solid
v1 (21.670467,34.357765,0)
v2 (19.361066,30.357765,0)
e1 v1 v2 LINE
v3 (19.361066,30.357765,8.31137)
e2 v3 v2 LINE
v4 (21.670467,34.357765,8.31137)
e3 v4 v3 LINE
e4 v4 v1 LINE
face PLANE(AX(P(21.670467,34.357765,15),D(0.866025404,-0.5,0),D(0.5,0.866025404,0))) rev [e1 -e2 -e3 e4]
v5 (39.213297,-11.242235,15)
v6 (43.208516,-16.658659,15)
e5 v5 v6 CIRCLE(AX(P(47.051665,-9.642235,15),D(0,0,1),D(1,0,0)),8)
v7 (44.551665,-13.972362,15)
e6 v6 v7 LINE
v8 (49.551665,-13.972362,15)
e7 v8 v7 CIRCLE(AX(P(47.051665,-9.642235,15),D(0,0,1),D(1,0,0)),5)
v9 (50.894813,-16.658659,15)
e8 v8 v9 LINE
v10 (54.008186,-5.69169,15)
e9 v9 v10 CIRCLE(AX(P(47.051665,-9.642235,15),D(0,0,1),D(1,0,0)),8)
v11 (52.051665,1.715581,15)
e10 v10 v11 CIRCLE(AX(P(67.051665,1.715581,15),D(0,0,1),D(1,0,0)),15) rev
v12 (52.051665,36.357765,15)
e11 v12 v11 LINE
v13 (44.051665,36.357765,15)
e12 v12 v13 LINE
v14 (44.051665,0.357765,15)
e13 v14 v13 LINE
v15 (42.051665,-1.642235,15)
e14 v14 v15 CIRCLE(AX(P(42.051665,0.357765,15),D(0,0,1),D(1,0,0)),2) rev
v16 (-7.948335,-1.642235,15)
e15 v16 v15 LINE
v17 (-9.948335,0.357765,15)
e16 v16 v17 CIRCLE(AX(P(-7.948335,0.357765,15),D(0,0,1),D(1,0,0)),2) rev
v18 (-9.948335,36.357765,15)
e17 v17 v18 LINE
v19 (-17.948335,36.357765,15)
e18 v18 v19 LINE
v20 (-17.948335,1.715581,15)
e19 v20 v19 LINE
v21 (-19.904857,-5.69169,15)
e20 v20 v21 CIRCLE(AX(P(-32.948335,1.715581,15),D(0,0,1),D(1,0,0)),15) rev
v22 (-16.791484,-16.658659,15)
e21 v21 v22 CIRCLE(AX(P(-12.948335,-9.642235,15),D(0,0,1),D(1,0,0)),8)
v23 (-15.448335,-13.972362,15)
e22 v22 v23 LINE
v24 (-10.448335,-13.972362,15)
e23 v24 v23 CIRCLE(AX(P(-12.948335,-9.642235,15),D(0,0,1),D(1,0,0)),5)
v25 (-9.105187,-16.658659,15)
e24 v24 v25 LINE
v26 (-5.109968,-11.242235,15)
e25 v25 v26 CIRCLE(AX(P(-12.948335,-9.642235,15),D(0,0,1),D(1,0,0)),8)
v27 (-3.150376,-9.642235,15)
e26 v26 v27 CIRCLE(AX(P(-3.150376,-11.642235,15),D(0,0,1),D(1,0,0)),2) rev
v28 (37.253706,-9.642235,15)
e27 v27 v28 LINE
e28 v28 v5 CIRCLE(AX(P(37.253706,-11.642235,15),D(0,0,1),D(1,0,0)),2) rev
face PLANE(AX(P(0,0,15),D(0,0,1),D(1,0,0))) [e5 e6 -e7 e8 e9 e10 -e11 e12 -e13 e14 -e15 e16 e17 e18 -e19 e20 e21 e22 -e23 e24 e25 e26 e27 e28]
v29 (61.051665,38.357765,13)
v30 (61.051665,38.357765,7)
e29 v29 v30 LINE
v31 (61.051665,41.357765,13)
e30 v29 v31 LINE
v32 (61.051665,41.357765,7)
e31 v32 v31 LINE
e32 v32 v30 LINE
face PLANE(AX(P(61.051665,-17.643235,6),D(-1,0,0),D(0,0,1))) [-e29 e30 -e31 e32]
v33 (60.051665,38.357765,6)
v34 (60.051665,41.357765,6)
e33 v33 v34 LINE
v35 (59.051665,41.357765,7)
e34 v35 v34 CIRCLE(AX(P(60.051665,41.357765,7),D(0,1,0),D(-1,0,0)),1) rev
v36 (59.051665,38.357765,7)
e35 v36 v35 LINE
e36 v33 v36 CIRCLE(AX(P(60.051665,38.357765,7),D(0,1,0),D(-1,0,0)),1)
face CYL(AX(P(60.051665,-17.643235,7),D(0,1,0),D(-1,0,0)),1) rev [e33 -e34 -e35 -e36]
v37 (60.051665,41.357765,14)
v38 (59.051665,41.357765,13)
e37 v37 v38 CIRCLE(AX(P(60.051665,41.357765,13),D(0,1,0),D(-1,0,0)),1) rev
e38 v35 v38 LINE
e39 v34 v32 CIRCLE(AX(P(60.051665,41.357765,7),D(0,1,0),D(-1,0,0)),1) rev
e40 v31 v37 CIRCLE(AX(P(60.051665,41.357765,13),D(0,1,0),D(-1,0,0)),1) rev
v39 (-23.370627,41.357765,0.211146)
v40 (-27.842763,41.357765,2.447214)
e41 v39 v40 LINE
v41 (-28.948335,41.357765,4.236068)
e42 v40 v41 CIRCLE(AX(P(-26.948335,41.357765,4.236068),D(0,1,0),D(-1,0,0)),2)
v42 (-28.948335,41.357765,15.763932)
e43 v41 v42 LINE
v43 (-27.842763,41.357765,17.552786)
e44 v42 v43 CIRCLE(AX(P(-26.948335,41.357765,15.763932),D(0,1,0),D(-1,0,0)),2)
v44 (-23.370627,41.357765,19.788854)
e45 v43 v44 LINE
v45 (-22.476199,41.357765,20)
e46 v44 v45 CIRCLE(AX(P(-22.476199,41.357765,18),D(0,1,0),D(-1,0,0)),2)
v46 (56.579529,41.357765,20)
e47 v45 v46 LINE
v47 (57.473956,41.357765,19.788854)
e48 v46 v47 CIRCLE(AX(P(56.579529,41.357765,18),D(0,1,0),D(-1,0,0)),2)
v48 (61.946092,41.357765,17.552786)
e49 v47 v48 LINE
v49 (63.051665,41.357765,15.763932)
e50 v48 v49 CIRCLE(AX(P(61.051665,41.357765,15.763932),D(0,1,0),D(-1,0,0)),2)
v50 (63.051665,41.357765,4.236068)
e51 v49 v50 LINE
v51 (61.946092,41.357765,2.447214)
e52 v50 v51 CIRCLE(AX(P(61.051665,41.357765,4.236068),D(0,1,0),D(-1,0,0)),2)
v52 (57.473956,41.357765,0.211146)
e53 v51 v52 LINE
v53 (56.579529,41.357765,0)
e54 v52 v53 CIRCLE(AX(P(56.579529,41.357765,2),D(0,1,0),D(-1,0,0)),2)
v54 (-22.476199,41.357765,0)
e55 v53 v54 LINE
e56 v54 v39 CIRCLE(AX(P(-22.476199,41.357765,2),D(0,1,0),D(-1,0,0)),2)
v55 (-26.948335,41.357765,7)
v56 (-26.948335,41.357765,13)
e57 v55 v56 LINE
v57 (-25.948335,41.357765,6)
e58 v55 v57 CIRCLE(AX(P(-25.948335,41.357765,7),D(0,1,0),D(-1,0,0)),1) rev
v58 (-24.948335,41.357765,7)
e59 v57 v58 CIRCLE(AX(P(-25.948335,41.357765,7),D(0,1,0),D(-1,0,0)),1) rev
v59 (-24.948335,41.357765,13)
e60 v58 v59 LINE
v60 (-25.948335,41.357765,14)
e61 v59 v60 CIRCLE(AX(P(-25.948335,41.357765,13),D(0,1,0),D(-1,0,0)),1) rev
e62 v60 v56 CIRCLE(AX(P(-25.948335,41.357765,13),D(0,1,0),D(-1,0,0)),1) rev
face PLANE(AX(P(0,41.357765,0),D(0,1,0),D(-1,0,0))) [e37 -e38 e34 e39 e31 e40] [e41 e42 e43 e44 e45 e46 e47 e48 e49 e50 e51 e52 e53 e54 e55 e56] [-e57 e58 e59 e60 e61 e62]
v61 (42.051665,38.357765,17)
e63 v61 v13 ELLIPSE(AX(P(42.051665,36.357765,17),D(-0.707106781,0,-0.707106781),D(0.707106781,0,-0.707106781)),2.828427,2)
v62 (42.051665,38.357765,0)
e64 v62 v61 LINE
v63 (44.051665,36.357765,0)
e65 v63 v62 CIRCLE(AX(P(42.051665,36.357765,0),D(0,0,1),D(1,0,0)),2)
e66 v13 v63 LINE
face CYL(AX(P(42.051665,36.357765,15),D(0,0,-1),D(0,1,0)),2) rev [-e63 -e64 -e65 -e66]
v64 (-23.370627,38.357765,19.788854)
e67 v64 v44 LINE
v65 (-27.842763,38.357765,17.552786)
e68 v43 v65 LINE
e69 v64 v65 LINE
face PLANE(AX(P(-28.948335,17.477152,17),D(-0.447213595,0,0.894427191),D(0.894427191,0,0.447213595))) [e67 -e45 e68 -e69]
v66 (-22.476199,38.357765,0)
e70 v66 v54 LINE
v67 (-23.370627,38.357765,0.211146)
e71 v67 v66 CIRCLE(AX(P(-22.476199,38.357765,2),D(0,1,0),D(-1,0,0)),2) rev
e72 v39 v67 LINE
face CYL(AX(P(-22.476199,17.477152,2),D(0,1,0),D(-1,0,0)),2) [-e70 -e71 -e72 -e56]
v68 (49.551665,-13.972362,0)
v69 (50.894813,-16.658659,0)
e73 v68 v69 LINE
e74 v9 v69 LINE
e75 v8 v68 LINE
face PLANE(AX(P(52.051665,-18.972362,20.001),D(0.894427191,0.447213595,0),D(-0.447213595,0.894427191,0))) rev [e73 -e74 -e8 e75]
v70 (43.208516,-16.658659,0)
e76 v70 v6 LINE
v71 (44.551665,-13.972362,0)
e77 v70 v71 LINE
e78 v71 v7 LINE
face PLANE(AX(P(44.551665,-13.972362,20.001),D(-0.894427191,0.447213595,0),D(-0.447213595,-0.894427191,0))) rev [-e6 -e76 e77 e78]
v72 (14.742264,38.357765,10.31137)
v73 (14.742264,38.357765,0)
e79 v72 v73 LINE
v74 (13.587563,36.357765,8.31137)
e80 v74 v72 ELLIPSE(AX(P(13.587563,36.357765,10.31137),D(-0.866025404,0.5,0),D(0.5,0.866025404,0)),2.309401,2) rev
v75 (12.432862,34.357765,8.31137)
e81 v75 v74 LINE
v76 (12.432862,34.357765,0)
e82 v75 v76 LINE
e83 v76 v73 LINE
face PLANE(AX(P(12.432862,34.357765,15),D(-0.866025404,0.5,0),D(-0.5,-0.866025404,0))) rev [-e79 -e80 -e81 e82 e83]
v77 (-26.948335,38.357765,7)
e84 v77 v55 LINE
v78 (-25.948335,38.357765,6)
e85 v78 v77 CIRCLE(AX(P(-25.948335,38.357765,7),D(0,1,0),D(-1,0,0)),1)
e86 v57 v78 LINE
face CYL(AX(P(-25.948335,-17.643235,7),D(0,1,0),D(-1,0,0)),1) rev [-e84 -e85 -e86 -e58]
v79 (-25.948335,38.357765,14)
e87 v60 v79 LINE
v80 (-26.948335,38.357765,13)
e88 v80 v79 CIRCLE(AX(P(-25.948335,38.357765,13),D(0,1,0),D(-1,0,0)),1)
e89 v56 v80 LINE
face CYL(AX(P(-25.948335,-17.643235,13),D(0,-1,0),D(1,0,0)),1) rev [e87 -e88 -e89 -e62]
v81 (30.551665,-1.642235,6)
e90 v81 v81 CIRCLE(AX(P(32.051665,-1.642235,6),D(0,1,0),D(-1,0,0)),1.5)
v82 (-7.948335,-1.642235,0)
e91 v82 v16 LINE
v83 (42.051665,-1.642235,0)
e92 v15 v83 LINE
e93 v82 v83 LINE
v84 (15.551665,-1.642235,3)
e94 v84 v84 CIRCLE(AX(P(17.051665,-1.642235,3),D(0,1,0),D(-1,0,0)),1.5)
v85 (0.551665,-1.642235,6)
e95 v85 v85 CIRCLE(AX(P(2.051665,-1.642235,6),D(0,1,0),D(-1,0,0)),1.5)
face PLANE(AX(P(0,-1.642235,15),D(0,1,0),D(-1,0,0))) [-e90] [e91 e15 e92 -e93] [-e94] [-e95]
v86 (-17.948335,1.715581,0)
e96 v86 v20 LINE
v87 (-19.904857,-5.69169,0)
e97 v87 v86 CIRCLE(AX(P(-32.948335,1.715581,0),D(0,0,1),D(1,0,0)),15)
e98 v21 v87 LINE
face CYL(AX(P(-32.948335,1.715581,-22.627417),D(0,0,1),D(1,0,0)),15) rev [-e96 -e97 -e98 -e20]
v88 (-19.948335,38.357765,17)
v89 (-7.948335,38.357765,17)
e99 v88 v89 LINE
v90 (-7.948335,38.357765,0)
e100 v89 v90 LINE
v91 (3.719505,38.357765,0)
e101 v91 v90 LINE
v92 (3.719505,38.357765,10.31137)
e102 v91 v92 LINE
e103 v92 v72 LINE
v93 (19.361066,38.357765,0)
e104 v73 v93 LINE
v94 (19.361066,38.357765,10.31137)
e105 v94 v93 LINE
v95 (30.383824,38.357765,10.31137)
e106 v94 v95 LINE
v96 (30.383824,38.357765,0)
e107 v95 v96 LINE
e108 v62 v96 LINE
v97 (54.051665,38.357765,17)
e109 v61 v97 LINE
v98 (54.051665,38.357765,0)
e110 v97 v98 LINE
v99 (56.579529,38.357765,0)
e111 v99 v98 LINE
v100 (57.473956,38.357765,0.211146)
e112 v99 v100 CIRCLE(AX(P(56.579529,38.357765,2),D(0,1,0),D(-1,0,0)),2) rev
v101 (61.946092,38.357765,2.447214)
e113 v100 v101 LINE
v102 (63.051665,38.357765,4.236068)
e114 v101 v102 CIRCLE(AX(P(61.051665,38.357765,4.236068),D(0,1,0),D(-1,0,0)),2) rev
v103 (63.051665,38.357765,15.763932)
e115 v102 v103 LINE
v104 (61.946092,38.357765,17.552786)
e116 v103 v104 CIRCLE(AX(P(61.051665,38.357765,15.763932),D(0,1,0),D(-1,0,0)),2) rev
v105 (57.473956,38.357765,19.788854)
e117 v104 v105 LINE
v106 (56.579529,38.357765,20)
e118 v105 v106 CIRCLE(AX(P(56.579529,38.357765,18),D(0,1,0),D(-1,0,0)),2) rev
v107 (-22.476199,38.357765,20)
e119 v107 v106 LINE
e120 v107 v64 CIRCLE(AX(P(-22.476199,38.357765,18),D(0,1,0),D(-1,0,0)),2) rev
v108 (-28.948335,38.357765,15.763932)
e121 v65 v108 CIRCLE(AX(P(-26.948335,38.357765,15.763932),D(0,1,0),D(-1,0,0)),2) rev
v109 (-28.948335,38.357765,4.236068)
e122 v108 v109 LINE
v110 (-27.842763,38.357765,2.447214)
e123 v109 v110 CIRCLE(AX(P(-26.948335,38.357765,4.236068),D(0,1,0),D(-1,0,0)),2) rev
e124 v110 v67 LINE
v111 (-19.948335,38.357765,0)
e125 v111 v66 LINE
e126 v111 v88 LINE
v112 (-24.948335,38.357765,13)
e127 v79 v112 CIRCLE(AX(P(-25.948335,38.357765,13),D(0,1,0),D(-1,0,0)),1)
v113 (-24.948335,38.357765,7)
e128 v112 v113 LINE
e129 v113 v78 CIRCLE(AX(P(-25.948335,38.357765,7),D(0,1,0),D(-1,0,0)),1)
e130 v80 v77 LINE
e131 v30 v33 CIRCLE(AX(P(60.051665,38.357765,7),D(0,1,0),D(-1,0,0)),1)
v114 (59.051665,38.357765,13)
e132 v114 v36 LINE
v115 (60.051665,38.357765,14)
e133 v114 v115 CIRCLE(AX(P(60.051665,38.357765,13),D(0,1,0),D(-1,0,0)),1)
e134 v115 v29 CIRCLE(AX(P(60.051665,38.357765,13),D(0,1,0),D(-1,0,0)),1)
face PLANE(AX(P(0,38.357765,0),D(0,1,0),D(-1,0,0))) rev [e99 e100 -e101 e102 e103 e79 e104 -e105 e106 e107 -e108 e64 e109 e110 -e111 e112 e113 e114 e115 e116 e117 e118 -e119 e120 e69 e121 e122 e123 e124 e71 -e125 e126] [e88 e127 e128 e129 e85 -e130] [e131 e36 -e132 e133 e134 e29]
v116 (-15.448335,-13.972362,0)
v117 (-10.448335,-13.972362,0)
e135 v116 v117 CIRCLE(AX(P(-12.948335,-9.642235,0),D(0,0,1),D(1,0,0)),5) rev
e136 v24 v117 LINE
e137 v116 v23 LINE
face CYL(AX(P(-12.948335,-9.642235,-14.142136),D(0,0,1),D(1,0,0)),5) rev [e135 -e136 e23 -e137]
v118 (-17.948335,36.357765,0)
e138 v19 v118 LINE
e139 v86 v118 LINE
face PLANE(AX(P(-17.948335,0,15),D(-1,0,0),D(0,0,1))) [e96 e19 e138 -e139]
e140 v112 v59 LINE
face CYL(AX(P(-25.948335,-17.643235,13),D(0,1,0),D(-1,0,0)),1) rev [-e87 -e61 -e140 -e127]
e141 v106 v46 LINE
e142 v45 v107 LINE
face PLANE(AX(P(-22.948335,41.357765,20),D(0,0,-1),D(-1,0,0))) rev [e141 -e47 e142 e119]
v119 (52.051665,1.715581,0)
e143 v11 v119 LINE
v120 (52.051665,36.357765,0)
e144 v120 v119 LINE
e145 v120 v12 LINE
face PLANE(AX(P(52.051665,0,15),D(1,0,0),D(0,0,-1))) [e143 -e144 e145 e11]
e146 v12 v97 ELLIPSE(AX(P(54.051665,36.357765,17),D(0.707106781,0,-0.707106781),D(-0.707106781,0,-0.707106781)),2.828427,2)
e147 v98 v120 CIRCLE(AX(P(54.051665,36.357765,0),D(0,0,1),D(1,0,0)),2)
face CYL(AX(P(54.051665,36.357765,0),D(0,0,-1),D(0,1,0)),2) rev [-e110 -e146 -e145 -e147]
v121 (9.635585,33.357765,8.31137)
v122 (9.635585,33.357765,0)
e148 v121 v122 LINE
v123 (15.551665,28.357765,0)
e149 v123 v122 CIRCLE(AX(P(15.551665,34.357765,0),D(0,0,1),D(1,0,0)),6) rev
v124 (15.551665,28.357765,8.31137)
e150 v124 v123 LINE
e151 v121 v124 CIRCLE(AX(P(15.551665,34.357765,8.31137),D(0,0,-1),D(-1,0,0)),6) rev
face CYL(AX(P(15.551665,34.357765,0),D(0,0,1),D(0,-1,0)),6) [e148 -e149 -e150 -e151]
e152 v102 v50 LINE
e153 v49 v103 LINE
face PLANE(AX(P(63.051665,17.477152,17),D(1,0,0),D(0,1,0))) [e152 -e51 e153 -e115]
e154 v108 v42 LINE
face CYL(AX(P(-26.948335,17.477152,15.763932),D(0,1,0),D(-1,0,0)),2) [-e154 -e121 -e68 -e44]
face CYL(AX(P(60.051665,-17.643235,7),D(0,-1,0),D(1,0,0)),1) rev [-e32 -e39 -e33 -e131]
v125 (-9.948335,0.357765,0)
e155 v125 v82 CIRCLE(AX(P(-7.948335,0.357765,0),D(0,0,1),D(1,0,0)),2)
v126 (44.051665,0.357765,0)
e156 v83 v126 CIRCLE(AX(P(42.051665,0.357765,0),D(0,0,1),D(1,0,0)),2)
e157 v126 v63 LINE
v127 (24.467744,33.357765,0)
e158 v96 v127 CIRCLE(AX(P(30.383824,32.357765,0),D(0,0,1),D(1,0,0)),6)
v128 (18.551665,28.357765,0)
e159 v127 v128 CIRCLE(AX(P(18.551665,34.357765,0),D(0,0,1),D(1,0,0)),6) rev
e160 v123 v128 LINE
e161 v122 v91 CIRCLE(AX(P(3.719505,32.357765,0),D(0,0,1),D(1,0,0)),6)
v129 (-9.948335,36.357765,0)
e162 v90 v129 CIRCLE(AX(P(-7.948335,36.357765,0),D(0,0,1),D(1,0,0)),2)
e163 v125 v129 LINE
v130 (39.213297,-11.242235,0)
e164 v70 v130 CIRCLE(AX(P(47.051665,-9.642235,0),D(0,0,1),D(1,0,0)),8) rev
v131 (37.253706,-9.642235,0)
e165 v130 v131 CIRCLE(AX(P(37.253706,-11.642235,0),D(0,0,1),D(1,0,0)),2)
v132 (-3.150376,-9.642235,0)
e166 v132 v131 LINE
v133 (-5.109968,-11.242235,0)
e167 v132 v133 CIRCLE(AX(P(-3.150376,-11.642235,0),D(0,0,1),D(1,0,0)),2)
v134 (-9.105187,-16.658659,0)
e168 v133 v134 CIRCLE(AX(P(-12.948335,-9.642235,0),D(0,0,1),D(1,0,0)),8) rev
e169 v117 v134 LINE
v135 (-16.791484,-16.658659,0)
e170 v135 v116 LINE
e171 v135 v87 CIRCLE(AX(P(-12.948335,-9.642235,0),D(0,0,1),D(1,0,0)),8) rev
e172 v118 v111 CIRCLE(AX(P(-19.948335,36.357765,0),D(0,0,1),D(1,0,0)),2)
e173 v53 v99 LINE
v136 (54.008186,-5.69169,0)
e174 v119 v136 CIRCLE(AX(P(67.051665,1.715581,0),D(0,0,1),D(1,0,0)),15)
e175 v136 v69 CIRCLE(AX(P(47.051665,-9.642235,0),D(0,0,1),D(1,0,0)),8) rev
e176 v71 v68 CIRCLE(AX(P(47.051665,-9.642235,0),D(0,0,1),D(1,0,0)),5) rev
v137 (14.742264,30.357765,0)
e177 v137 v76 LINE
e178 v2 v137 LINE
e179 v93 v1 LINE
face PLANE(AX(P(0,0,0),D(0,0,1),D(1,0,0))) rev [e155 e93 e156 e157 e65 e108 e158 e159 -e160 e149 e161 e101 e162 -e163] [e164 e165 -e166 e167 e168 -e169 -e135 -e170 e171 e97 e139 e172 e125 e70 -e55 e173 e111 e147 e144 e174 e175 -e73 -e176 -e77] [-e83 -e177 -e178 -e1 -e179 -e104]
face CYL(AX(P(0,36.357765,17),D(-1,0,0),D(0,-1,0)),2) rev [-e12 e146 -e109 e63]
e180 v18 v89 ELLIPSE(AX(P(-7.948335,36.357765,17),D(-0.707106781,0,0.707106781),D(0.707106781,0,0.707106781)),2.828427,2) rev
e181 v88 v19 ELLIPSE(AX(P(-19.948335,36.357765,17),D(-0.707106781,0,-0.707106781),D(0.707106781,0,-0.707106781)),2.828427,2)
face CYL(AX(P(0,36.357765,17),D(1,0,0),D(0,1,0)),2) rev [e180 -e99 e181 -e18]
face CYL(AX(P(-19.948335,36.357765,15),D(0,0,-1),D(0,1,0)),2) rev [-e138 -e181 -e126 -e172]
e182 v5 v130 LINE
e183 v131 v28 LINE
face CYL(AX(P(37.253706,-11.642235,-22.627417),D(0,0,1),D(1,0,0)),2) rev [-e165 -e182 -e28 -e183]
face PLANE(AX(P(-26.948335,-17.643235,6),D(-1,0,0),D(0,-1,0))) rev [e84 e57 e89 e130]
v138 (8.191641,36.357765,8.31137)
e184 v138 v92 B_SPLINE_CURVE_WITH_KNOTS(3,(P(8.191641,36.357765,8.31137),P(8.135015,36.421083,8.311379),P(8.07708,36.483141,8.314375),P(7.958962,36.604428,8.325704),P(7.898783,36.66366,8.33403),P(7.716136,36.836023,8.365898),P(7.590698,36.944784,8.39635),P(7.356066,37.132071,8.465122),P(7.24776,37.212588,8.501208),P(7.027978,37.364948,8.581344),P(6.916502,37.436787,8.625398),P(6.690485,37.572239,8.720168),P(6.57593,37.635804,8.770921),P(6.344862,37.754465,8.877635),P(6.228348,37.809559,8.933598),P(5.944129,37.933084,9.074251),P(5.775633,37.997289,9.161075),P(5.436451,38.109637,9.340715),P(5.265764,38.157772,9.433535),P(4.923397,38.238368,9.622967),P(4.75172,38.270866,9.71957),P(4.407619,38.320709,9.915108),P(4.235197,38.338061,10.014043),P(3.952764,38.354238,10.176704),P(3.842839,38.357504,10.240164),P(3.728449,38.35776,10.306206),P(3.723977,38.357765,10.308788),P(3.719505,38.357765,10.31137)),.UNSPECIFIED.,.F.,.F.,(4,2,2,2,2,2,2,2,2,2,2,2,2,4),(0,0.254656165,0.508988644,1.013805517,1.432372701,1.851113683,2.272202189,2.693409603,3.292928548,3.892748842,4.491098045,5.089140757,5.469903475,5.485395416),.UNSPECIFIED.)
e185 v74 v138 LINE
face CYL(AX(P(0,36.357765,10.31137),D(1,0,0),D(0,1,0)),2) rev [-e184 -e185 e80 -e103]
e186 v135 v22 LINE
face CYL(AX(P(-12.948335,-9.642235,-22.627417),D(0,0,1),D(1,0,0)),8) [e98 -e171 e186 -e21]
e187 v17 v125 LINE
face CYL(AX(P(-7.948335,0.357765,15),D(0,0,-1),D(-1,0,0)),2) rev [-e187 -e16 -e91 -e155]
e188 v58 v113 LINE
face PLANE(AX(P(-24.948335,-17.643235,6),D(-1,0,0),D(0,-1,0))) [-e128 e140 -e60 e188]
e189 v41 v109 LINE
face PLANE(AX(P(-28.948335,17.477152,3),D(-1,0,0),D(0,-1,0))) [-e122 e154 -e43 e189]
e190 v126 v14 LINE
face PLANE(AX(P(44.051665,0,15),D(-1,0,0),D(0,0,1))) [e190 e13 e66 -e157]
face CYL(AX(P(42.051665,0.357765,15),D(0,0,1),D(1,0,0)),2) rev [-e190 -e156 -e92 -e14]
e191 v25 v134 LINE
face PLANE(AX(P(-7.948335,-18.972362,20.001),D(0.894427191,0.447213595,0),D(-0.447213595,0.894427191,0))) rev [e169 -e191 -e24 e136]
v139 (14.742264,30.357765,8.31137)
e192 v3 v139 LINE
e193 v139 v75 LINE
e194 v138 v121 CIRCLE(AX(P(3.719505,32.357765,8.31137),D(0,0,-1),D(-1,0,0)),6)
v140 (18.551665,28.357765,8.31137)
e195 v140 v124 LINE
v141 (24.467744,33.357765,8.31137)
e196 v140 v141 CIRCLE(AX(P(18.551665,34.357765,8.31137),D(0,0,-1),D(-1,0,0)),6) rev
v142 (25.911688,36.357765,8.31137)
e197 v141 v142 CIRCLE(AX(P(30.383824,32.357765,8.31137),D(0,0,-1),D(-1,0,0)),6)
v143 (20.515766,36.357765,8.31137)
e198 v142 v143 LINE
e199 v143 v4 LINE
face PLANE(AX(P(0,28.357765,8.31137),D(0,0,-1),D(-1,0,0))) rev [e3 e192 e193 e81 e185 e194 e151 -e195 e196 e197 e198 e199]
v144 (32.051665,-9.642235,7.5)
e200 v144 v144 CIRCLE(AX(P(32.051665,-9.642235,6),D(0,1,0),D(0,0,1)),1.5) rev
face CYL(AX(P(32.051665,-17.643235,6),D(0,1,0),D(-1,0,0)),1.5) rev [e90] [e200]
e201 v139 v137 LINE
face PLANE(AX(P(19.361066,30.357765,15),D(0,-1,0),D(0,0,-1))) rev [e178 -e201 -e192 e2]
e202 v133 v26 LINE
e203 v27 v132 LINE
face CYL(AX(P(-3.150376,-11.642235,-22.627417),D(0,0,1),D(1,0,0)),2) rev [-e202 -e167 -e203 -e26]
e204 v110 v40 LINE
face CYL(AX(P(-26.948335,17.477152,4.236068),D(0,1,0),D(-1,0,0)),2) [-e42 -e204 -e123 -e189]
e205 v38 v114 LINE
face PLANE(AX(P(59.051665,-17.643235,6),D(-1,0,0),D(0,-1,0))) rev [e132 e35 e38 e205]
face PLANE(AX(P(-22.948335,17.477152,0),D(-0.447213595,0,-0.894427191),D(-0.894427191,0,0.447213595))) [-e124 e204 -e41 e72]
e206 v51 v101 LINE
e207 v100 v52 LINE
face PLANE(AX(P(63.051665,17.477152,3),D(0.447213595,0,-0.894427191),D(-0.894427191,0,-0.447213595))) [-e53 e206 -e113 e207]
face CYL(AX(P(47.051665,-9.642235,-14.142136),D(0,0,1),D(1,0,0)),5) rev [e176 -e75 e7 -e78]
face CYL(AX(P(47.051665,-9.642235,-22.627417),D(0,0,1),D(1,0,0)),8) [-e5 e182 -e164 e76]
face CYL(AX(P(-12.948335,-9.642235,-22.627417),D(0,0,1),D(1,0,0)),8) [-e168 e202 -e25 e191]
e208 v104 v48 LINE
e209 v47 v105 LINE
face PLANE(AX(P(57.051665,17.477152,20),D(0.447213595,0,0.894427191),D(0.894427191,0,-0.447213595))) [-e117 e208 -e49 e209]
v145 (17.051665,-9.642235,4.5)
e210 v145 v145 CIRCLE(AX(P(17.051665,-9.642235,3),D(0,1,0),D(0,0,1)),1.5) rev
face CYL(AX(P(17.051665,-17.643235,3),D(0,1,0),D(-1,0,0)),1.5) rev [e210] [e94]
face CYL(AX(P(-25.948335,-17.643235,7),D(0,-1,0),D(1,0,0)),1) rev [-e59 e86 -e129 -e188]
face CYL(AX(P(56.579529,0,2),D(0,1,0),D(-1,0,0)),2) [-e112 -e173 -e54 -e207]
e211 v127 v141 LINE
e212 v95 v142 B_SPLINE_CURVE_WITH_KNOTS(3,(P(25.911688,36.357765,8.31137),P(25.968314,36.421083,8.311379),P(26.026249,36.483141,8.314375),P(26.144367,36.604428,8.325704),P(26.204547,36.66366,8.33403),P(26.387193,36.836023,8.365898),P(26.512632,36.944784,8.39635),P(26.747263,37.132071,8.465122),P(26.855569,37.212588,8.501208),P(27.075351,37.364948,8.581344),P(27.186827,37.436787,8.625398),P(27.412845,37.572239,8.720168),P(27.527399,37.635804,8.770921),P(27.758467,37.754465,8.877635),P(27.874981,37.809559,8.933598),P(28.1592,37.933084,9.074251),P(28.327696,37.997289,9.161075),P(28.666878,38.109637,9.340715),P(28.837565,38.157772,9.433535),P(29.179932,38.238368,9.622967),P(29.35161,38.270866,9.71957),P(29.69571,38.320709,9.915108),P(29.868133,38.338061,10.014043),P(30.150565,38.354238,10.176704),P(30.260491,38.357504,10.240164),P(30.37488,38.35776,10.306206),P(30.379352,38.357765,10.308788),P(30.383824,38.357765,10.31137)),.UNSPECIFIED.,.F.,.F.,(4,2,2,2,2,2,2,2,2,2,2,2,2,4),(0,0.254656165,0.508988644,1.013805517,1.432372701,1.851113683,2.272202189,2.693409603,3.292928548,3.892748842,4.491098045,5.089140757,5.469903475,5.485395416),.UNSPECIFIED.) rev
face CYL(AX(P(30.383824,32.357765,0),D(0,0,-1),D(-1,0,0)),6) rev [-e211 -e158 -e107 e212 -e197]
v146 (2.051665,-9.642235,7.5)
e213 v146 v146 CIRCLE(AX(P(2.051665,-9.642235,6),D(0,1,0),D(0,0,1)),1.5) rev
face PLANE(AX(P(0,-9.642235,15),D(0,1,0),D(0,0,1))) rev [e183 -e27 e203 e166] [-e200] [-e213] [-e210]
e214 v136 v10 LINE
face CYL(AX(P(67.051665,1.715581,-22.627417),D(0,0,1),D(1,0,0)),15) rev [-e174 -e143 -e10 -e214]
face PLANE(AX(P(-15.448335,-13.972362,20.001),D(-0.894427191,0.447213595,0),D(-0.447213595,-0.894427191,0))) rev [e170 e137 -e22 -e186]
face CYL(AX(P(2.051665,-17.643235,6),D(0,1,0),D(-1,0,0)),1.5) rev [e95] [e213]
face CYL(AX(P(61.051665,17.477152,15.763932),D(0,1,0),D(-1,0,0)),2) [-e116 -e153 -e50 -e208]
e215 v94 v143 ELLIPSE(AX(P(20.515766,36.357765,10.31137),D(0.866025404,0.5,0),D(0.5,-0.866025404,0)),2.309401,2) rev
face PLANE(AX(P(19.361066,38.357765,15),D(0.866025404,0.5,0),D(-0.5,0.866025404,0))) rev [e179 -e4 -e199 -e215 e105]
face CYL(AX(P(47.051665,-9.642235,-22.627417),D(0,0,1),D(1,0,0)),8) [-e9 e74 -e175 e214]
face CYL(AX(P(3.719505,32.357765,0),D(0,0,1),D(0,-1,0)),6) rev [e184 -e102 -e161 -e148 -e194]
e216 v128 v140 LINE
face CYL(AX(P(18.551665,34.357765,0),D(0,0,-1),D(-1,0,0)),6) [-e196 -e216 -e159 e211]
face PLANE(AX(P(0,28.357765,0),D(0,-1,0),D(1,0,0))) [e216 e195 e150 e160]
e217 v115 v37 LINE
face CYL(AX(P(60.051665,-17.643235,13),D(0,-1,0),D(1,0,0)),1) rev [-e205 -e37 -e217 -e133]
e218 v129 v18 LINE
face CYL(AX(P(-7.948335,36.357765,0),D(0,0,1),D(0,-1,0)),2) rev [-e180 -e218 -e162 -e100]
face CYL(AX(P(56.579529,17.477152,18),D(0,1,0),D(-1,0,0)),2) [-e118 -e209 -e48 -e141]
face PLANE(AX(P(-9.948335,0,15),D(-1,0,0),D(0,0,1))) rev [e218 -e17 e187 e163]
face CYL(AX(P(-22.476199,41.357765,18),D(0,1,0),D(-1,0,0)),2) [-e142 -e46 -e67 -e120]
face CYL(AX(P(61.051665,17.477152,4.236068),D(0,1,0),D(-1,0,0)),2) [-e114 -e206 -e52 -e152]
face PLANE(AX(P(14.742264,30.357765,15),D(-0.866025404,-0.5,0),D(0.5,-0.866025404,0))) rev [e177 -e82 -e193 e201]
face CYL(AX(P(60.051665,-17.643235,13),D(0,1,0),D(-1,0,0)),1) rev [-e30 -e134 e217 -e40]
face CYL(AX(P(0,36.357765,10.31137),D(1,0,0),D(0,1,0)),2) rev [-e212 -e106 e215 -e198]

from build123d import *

# Parameters (mm, degrees)
BOSS_EXTRUDE1_DEPTH = 15
SKETCH4_R           = 8.000000000000002
SKETCH4_R_2         = 7.999999999999998
BOSS_EXTRUDE2_DEPTH = 15
SKETCH5_R           = 5.000000000000004
SKETCH5_R_2         = 5.0000000000000036
CUT_EXTRUDE2_DEPTH  = 15
FILLET2_R           = 15
FILLET3_R           = 2
FILLET4_R           = 2
BOSS_EXTRUDE3_DEPTH = 3
CUT_EXTRUDE3_REACH  = 76.188
SKETCH10_R          = 1.5000000000000007
SKETCH10_R_2        = 1.500000000000004
BOSS_EXTRUDE4_DEPTH = 10.000000000000002
BOSS_EXTRUDE5_DEPTH = 3
CUT_EXTRUDE5_REACH  = 90.637
FILLET5_R           = 1
FILLET6_R           = 2
CUT_EXTRUDE6_REACH  = 80.013
FILLET7_R           = 6
FILLET8_R           = 6
FILLET9_R           = 2
CUT_EXTRUDE7_DEPTH  = 15
FILLET10_R          = 2


# Some blends are built 0.0001 mm under size
with BuildPart() as part:
    # Sketch1 → Boss-Extrude1 (new body)
    with BuildSketch(Plane.XY):
        Polygon((-17.948335406616224, 38.357764788911155), (-17.948335406616224, -1.642235211088847), (-9.948335406616222, -1.6422352110888458), (-9.948335406616222, 38.35776478891115), align=None)
        Polygon((52.051664593383784, -1.6422352110888379), (52.051664593383784, -9.642235211088838), (-17.948335406616224, -9.642235211088838), (-17.948335406616224, -1.642235211088847), align=None)
        Polygon((44.051664593383784, 38.35776478891116), (44.051664593383784, -1.6422352110888392), (52.05166459338378, -1.6422352110888379), (52.051664593383784, 38.35776478891116), align=None)
    extrude(amount=BOSS_EXTRUDE1_DEPTH)

    # Sketch4 → Boss-Extrude2 (add)
    with BuildSketch(Plane.XY.offset(15)):
        with Locations((-12.948335406616222, -9.642235211088838)):
            Circle(SKETCH4_R)
        with Locations((47.05166459338378, -9.64223521108884)):
            Circle(SKETCH4_R_2)
    extrude(amount=-BOSS_EXTRUDE2_DEPTH)

    # Sketch5 → Cut-Extrude2 (cut)
    with BuildSketch(Plane.XY.offset(15)):
        with Locations((-12.948335406616222, -9.642235211088838)):
            Circle(SKETCH5_R)
        with Locations((47.05166459338378, -9.642235211088837)):
            Circle(SKETCH5_R_2)
    extrude(amount=-CUT_EXTRUDE2_DEPTH, mode=Mode.SUBTRACT)

    # Fillet2
    fillet2_edges = [part.edges().sort_by_distance(p)[0] for p in [
        (-17.948335406616224, -3.397237212690439, 7.5),
        (52.051664593383784, -3.3972372126904498, 7.5),
    ]]
    fillet(fillet2_edges, radius=FILLET2_R)

    # Fillet3
    fillet3_edges = [part.edges().sort_by_distance(p)[0] for p in [
        (-4.94833540661622, -9.642235211088838, 7.5),
        (39.05166459338378, -9.642235211088838, 7.5),
    ]]
    fillet(fillet3_edges, radius=FILLET3_R)

    # Fillet4
    fillet4_edges = [part.edges().sort_by_distance(p)[0] for p in [
        (-9.948335406616222, -1.6422352110888463, 7.5),
        (44.051664593383784, -1.6422352110888392, 7.5),
    ]]
    fillet(fillet4_edges, radius=FILLET4_R)

    # Sketch6 → Boss-Extrude3 (add)
    with BuildSketch(Plane(origin=(3.327e-14, 38.35776478891114, 0), x_dir=(1, -4.3e-16, 0), z_dir=(4.3e-16, 1, 0))):
        Polygon((-22.948335406616234, 0), (57.05166459338378, 0), (57.05166459338378, -20), (-22.948335406616227, -20), align=None)
    extrude(amount=BOSS_EXTRUDE3_DEPTH)

    # Sketch10 → Cut-Extrude3 (cut, up to next)
    with BuildSketch(Plane(origin=(2.1e-16, -1.6422352110888447, 0), x_dir=(1, 1.3e-16, 0), z_dir=(-1.3e-16, 1, 0)), mode=Mode.PRIVATE) as cut_extrude3_sk1:
        with Locations(Location((2.0516645933837814, -6, 0), (0, 0, 180))):
            Circle(SKETCH10_R)
    cut_extrude3_tool1 = extrude(cut_extrude3_sk1.sketch, amount=-CUT_EXTRUDE3_REACH, mode=Mode.PRIVATE) & part.part
    # Sketch10 → Cut-Extrude3 (cut, up to next)
    with BuildSketch(Plane(origin=(2.1e-16, -1.6422352110888447, 0), x_dir=(1, 1.3e-16, 0), z_dir=(-1.3e-16, 1, 0)), mode=Mode.PRIVATE) as cut_extrude3_sk2:
        with Locations(Location((17.05166459338378, -3, 0), (0, 0, 180))):
            Circle(SKETCH10_R)
    cut_extrude3_tool2 = extrude(cut_extrude3_sk2.sketch, amount=-CUT_EXTRUDE3_REACH, mode=Mode.PRIVATE) & part.part
    # Sketch10 → Cut-Extrude3 (cut, up to next)
    with BuildSketch(Plane(origin=(2.1e-16, -1.6422352110888447, 0), x_dir=(1, 1.3e-16, 0), z_dir=(-1.3e-16, 1, 0)), mode=Mode.PRIVATE) as cut_extrude3_sk3:
        with Locations(Location((32.051664593383784, -6, 0), (0, 0, 180))):
            Circle(SKETCH10_R_2)
    cut_extrude3_tool3 = extrude(cut_extrude3_sk3.sketch, amount=-CUT_EXTRUDE3_REACH, mode=Mode.PRIVATE) & part.part
    add(cut_extrude3_tool1.solids().sort_by_distance((2.051665, -1.642235, 6))[0], mode=Mode.SUBTRACT)
    add(cut_extrude3_tool2.solids().sort_by_distance((17.051665, -1.642235, 3))[0], mode=Mode.SUBTRACT)
    add(cut_extrude3_tool3.solids().sort_by_distance((32.051665, -1.642235, 6))[0], mode=Mode.SUBTRACT)

    # Sketch11 → Boss-Extrude4 (add)
    with BuildSketch(Plane.XZ.offset(-38.35776478891114)):
        Polygon((24.55166459338377, 7.3e-16), (9.551664593383764, -2.02e-15), (9.551664593383764, 8.311370234309834), (24.551664593383766, 8.311370234309837), align=None)
    extrude(amount=BOSS_EXTRUDE4_DEPTH)

    # Sketch12 → Boss-Extrude5 (add)
    with BuildSketch(Plane(origin=(1.794e-14, 41.35776478891114, 0), x_dir=(1, -4.3e-16, 0), z_dir=(4.3e-16, 1, 0))):
        Polygon((-22.948335406616234, 0), (-28.94833540661623, -3), (-28.94833540661623, -17), (-22.948335406616227, -20), align=None)
        Polygon((57.05166459338377, -20.000000000000057), (63.05166459338377, -16.999999999999943), (63.05166459338377, -2.9999999999999574), (57.05166459338377, 0), align=None)
    extrude(amount=-BOSS_EXTRUDE5_DEPTH)

    # Sketch13 → Cut-Extrude5 (cut, up to next)
    with BuildSketch(Plane(origin=(1.794e-14, 41.35776478891114, 0), x_dir=(1, -4.3e-16, 0), z_dir=(4.3e-16, 1, 0)), mode=Mode.PRIVATE) as cut_extrude5_sk1:
        Polygon((59.05166459338377, -6), (61.05166459338377, -6), (61.05166459338378, -14), (59.05166459338377, -14), align=None)
    cut_extrude5_tool1 = extrude(cut_extrude5_sk1.sketch, amount=-CUT_EXTRUDE5_REACH, mode=Mode.PRIVATE) & part.part
    # Sketch13 → Cut-Extrude5 (cut, up to next)
    with BuildSketch(Plane(origin=(1.794e-14, 41.35776478891114, 0), x_dir=(1, -4.3e-16, 0), z_dir=(4.3e-16, 1, 0)), mode=Mode.PRIVATE) as cut_extrude5_sk2:
        Polygon((-26.948335406616234, -5.999999999999999), (-24.94833540661623, -6), (-24.94833540661623, -14.000000000000002), (-26.948335406616234, -14.000000000000002), align=None)
    cut_extrude5_tool2 = extrude(cut_extrude5_sk2.sketch, amount=-CUT_EXTRUDE5_REACH, mode=Mode.PRIVATE) & part.part
    add(cut_extrude5_tool1.solids().sort_by_distance((60.051665, 41.357765, 10))[0], mode=Mode.SUBTRACT)
    add(cut_extrude5_tool2.solids().sort_by_distance((-25.948335, 41.357765, 10))[0], mode=Mode.SUBTRACT)

    # Fillet5
    fillet5_edges = [part.edges().sort_by_distance(p)[0] for p in [
        (59.05166459338379, 39.85776478891111, 6),
        (61.05166459338379, 39.85776478891111, 6),
        (61.0516645933838, 39.85776478891111, 14),
        (59.05166459338379, 39.85776478891111, 14),
        (-26.948335406616216, 39.857764788911155, 14.000000000000002),
        (-24.948335406616213, 39.857764788911155, 14.000000000000002),
        (-24.948335406616213, 39.857764788911155, 6),
        (-26.948335406616216, 39.857764788911155, 5.999999999999999),
    ]]
    fillet(fillet5_edges, radius=FILLET5_R - 0.0001)  # a hair under: the kernel refuses the full size

    # Fillet6
    fillet6_edges = [part.edges().sort_by_distance(p)[0] for p in [
        (-22.948335406616202, 39.85776478891115, 0),
        (-22.948335406616195, 39.85776478891115, 20),
        (57.05166459338381, 39.85776478891112, 20),
        (57.05166459338381, 39.85776478891112, 0),
        (-28.948335406616213, 39.857764788911155, 17),
        (-28.948335406616213, 39.857764788911155, 3),
        (63.05166459338379, 39.85776478891111, 2.9999999999999574),
        (63.05166459338379, 39.85776478891111, 16.999999999999943),
    ]]
    fillet(fillet6_edges, radius=FILLET6_R)

    # Sketch14 → Cut-Extrude6 (cut, up to next)
    with BuildSketch(Plane(origin=(0, 0, 0), x_dir=(-1, 0, 0), z_dir=(0, 0, -1)), mode=Mode.PRIVATE) as cut_extrude6_sk1:
        Polygon((-42.051664593383784, -18.97236223001103), (-52.05166459338378, -18.97236223001103), (-49.55166459338378, -13.972362230011036), (-44.55166459338378, -13.972362230011036), align=None)
    cut_extrude6_tool1 = extrude(cut_extrude6_sk1.sketch, amount=-CUT_EXTRUDE6_REACH, mode=Mode.PRIVATE) & part.part
    # Sketch14 → Cut-Extrude6 (cut, up to next)
    with BuildSketch(Plane(origin=(0, 0, 0), x_dir=(-1, 0, 0), z_dir=(0, 0, -1)), mode=Mode.PRIVATE) as cut_extrude6_sk2:
        Polygon((17.948335406616224, -18.972362230011036), (7.948335406616221, -18.972362230011036), (10.448335406616224, -13.972362230011036), (15.448335406616224, -13.972362230011036), align=None)
    cut_extrude6_tool2 = extrude(cut_extrude6_sk2.sketch, amount=-CUT_EXTRUDE6_REACH, mode=Mode.PRIVATE) & part.part
    add(cut_extrude6_tool1.solids().sort_by_distance((47.051665, -16.75014, 0))[0], mode=Mode.SUBTRACT)
    add(cut_extrude6_tool2.solids().sort_by_distance((-12.948335, -16.75014, 0))[0], mode=Mode.SUBTRACT)

    # Fillet7
    fillet7_edges = [part.edges().sort_by_distance(p)[0] for p in [
        (24.55166459338378, 28.35776478891113, 4.155685117154919),
        (9.551664593383776, 28.357764788911137, 4.155685117154916),
    ]]
    fillet(fillet7_edges, radius=FILLET7_R)

    # Fillet8
    # the kernel refuses this fillet: 6 mm, written as the material it adds along each edge
    with BuildSketch(Plane(origin=(24.551664593383784, 38.35776478891113, 8.311370234309837), x_dir=(1, -1.22e-15, 4.3e-16), z_dir=(4.3e-16, 0, -1))) as fillet8_piece_1:
        with BuildLine():
            CenterArc((5.832159566204599, 6), FILLET8_R, 189.5940682268561, 80.40593177314383)
            Line((-0.08392021689509223, 5.000000000000448), (-0.675528195205062, 4.90000000000049))
            ThreePointArc((-0.675528195205062, 4.90000000000049), (-0.5999999999999965, 4.000000000000001), (-0.6000000000000014, 7.3e-16))
            Line((-0.6000000000000014, 7.3e-16), (-7.3e-16, -0.6000000000000014))
            Line((-7.3e-16, -0.6000000000000014), (5.832159566204594, -0.6000000000000014))
            Line((5.832159566204594, -0.6000000000000014), (5.832159566204595, 0))
        make_face()
    extrude(amount=8.311370234309837)
    with BuildSketch(Plane(origin=(9.55166459338378, 38.35776478891113, -2.02e-15), x_dir=(0.01678167981240219, -0.9998591776958763, 0), z_dir=(0, 0, 1))) as fillet8_piece_2:
        with BuildLine():
            CenterArc((5.901281631719588, -5.932028346925651), FILLET8_R, 98.63250366346277, 80.40593177319276)
            Line((-0.09787343445575636, -5.831338268056363), (-0.6977889410732921, -5.8212692601694345))
            Line((-0.6977889410732921, -5.8212692601694345), (-0.5999155066175272, 0.01006900788744134))
            Line((-0.5999155066175272, 0.01006900788744134), (0.01006900788744131, 0.5999155066175255))
            ThreePointArc((0.01006900788744131, 0.5999155066175255), (4.009505718670954, 0.5327887873679148), (4.9106464685856706, 0.5932028346925657))
            Line((4.9106464685856706, 0.5932028346925657), (5.000704210688756, 1e-17))
        make_face()
    extrude(amount=8.311370234309836)

    # Fillet9
    fillet9_edges = [part.edges().sort_by_distance(p)[0] for p in [
        (17.05166459338424, 38.35776478891257, 8.31137023431),
    ]]
    fillet(fillet9_edges, radius=FILLET9_R)

    # Sketch15 → Cut-Extrude7 (cut)
    with BuildSketch(Plane(origin=(0, 0, 0), x_dir=(-1, 0, 0), z_dir=(0, 0, -1))):
        Polygon((-12.43286243986677, 34.35776478891113), (-14.742263516625279, 38.35776478891114), (-19.36106567014228, 38.35776478891114), (-21.67046674690079, 34.35776478891113), (-19.36106567014228, 30.357764788911126), (-14.742263516625275, 30.357764788911126), align=None)
    extrude(amount=-CUT_EXTRUDE7_DEPTH, mode=Mode.SUBTRACT)

    # Fillet10
    fillet10_edges = [part.edges().sort_by_distance(p)[0] for p in [
        (-17.948335406616224, 38.357764788911155, 7.5),
        (-9.948335406616222, 38.35776478891115, 7.5),
        (44.051664593383784, 38.35776478891116, 7.5),
        (52.051664593383784, 38.35776478891116, 7.5),
        (48.051664593383784, 38.35776478891116, 15),
        (-13.948335406616224, 38.357764788911155, 15),
    ]]
    fillet(fillet10_edges, radius=FILLET10_R)


solid = part.part
